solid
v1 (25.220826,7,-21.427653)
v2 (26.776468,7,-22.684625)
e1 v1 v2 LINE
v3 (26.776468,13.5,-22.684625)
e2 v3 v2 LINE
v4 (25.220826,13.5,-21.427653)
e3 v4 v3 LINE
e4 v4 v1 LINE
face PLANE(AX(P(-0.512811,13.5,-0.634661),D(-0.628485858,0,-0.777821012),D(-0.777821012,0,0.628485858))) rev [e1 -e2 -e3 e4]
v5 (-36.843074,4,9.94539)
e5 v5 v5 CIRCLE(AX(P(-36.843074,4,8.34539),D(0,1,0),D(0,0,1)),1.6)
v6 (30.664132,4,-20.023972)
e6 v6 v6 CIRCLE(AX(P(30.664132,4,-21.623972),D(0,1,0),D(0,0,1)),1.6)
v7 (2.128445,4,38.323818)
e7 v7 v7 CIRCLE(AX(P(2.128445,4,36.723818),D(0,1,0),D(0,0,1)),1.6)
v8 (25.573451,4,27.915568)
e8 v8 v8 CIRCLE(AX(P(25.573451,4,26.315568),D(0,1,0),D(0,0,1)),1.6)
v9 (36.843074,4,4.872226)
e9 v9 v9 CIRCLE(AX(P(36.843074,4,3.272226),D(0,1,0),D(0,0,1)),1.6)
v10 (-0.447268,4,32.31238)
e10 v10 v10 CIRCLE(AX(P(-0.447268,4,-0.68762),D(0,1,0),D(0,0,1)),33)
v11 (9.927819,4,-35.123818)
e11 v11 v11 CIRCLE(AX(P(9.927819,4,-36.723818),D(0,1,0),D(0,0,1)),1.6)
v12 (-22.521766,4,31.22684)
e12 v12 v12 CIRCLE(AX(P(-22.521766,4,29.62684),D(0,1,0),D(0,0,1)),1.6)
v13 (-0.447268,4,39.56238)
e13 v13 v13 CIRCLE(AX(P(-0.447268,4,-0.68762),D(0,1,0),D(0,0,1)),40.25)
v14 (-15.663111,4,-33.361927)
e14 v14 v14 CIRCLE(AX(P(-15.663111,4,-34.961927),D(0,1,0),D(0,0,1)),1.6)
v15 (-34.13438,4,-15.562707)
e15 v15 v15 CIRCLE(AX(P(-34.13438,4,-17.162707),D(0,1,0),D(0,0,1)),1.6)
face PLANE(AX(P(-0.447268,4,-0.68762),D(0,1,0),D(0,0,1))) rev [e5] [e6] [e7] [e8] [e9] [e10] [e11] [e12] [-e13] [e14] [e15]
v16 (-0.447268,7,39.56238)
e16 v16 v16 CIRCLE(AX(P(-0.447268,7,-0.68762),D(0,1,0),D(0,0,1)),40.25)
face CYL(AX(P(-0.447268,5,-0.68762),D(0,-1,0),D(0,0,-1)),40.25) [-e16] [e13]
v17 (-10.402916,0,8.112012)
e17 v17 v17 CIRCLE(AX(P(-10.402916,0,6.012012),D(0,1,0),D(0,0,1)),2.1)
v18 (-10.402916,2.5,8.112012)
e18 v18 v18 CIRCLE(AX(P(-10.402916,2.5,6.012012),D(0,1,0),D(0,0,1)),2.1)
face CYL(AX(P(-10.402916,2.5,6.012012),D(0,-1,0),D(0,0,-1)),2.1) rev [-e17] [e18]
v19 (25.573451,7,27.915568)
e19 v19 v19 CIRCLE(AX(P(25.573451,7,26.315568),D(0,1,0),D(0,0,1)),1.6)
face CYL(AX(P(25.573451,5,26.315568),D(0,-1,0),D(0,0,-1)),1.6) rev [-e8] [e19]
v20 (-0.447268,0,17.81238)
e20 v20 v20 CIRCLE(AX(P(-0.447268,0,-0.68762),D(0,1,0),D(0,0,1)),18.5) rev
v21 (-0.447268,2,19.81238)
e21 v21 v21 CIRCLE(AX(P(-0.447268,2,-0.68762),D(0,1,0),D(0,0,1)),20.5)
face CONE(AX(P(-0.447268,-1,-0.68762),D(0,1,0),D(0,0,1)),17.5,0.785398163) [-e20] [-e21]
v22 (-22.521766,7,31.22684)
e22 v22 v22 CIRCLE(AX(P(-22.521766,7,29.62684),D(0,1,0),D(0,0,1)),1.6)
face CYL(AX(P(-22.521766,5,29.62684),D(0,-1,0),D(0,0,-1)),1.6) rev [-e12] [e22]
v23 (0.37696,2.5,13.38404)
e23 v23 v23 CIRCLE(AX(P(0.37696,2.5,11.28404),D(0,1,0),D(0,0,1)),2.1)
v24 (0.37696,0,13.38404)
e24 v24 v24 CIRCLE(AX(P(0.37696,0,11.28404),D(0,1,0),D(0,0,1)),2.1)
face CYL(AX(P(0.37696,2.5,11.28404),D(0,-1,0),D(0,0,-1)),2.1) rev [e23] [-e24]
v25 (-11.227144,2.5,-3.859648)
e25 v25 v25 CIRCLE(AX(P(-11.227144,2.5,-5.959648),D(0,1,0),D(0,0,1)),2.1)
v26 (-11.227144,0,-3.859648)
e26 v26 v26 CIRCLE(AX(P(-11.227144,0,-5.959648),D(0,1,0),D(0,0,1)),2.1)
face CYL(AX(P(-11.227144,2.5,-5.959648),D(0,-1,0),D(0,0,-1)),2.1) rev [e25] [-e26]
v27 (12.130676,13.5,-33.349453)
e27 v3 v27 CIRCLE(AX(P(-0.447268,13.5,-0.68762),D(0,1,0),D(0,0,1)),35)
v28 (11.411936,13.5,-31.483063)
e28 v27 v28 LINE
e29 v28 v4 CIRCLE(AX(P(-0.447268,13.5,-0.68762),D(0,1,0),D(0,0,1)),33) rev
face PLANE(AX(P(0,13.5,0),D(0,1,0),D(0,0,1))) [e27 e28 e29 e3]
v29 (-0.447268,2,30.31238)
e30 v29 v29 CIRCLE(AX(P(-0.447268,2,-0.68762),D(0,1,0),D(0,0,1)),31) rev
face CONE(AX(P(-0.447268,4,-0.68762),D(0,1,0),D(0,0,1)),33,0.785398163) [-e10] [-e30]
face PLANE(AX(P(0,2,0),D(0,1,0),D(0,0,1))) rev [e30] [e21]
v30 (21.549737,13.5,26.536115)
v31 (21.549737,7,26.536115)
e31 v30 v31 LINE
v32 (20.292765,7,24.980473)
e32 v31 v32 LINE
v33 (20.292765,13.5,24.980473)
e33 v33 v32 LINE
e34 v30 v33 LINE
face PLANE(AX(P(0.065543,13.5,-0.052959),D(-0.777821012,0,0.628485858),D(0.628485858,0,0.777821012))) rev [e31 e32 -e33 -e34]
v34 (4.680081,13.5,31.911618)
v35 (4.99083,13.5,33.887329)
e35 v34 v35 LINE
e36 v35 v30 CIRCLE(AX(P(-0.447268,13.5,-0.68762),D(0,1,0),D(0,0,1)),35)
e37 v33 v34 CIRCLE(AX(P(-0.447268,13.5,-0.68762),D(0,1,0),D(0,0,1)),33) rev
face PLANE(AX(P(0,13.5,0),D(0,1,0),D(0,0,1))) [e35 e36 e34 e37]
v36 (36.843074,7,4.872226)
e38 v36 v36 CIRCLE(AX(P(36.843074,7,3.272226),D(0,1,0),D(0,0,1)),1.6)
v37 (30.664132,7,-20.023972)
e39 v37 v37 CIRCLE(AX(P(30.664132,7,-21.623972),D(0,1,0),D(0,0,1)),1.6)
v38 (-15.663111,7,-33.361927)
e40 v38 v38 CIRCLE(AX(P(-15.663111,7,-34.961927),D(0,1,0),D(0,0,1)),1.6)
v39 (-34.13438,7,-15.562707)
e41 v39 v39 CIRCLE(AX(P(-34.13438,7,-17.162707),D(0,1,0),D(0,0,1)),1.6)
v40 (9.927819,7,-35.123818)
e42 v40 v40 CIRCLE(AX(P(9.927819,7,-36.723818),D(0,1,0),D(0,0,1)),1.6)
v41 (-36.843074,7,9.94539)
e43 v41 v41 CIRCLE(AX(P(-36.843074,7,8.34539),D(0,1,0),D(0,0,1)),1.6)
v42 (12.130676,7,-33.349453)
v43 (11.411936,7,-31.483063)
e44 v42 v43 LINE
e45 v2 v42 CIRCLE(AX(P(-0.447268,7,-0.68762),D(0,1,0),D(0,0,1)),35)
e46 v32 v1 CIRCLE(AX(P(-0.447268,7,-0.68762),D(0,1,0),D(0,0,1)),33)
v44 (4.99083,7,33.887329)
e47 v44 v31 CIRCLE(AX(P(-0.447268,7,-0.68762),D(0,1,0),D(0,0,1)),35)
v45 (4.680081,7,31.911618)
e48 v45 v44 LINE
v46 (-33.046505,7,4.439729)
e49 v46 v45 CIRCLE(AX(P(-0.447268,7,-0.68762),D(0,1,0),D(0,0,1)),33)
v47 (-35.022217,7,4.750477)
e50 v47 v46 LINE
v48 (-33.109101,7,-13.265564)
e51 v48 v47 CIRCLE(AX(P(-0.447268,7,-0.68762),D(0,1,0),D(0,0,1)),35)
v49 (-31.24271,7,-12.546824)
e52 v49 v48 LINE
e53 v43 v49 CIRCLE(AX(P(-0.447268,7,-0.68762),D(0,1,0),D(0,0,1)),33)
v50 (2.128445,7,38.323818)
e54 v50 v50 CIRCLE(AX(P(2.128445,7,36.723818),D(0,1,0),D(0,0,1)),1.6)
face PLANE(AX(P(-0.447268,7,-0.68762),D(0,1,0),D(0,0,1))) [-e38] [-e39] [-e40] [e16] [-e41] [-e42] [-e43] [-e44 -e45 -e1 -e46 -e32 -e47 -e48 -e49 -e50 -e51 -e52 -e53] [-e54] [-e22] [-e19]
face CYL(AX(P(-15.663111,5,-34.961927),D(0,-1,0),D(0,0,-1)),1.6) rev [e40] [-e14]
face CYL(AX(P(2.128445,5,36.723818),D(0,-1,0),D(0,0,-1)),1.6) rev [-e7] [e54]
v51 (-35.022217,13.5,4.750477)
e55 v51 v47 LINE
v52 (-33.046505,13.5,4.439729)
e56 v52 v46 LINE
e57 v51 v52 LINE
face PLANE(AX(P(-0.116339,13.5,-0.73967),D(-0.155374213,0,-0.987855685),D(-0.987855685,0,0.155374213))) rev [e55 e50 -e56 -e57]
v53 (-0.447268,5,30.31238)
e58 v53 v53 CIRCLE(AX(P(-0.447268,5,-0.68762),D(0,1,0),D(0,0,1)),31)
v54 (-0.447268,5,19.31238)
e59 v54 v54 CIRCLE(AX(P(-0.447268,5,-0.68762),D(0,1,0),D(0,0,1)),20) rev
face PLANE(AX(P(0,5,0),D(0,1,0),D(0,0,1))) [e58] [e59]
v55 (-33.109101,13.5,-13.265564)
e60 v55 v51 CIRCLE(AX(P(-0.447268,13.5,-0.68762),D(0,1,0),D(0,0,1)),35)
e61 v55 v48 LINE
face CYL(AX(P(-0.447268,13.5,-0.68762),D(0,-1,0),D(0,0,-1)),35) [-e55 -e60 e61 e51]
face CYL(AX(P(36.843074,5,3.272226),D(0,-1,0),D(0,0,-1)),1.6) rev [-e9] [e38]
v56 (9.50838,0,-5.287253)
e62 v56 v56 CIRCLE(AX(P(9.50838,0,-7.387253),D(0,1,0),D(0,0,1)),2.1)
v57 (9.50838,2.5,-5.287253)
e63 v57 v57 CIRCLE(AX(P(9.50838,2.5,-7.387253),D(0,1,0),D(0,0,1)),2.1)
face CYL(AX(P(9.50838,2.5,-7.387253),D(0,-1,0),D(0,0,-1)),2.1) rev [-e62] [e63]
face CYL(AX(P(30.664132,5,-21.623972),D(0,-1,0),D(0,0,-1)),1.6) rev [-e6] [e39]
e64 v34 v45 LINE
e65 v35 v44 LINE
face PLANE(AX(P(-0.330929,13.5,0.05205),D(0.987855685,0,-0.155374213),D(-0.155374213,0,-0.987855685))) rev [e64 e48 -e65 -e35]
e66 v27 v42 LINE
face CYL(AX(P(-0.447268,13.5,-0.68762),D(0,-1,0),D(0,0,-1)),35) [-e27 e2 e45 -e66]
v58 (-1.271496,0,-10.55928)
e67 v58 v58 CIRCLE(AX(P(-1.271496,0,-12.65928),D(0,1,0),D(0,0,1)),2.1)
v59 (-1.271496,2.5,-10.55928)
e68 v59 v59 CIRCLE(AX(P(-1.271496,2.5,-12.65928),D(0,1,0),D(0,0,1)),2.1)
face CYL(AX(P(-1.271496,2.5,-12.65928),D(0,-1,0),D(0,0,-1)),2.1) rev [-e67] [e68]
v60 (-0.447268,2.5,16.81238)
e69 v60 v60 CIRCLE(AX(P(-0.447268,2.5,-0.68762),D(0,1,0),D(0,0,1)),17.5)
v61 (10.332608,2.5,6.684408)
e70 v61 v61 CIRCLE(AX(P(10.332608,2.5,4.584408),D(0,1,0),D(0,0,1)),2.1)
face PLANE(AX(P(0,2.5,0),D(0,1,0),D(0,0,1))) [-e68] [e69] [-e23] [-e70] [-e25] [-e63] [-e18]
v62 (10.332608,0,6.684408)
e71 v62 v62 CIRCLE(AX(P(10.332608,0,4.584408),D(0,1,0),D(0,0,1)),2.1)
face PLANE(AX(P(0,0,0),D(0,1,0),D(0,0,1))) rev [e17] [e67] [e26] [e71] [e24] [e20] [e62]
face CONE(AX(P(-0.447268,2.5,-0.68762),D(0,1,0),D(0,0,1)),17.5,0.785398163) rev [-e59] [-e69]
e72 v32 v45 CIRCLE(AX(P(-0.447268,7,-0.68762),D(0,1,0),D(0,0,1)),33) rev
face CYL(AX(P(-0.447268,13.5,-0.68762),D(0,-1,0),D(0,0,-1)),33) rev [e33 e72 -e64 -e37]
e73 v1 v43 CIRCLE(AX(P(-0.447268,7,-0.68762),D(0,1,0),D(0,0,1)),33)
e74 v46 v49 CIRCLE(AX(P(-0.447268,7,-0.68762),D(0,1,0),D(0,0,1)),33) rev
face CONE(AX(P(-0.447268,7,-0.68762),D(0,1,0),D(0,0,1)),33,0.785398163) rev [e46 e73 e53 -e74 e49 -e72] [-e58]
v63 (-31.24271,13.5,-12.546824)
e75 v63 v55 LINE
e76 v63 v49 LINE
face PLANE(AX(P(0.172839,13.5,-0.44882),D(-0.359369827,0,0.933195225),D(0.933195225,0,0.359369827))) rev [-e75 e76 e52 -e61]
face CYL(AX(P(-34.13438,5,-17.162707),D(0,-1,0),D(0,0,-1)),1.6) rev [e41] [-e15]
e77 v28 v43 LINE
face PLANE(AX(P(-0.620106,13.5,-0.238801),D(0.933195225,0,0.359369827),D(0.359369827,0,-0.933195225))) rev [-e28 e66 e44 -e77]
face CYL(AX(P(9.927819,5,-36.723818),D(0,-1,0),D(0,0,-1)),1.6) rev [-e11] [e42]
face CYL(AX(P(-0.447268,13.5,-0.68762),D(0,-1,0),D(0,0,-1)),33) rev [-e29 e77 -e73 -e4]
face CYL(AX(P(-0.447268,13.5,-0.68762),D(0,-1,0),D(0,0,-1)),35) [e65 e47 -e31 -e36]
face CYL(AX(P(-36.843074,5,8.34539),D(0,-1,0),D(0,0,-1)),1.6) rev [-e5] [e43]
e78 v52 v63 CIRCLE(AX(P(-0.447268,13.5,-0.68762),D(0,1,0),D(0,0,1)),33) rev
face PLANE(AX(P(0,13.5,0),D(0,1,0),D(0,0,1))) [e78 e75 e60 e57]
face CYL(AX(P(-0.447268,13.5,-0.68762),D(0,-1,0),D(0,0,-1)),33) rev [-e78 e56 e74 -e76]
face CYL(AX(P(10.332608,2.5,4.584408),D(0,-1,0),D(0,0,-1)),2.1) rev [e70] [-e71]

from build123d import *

# Parameters (mm, degrees)
EXTRUDE_START       = 2
SKETCH_3_R          = 40.25
SKETCH_3_R_2        = 1.6
SKETCH_3_R_3        = 17.5
EXTRUDE_1_DEPTH     = 3
SKETCH_3_4_R        = 17.5
SKETCH_3_4_R_2      = 2.1
EXTRUDE_3_DEPTH     = 2.5
CHAMFER_1_SIZE      = 3
CHAMFER_4_SIZE      = 2.5
SKETCH_4_R          = 40.25
SKETCH_4_R_2        = 33
SKETCH_4_R_3        = 1.6
EXTRUDE_4_DEPTH     = 2
CUT_EXTRUDE_START   = -13
SKETCH_4_4_R        = 40.25
SKETCH_4_4_R_2      = 33
SKETCH_4_4_R_3      = 1.6
CUT_EXTRUDE_4_DEPTH = 12
CHAMFER_5_SIZE      = 2
CHAMFER_8_SIZE      = 2
SKETCH_5_R          = 1.6
EXTRUDE_5_DEPTH     = 6.5


# Some blends are built 0.0001 mm under size
with BuildPart() as part:
    # 草图3 → 凸台-拉伸1 (new body)
    with BuildSketch(Plane(origin=(0, 0, 0), x_dir=(1, 0, 0), z_dir=(0, 1, 0)).offset(EXTRUDE_START)):
        with Locations(Location((-0.44726781, 0.687620087, 0), (0, 0, 270))):
            Circle(SKETCH_3_R)
        with Locations(Location((-15.663111428, 34.961926834, 0), (0, 0, 270))):
            Circle(SKETCH_3_R_2, mode=Mode.SUBTRACT)
        with Locations(Location((9.927819446, 36.723818061, 0), (0, 0, 270))):
            Circle(SKETCH_3_R_2, mode=Mode.SUBTRACT)
        with Locations(Location((30.664131688, 21.623971758, 0), (0, 0, 270))):
            Circle(SKETCH_3_R_2, mode=Mode.SUBTRACT)
        with Locations(Location((36.843074339, -3.272226173, 0), (0, 0, 270))):
            Circle(SKETCH_3_R_2, mode=Mode.SUBTRACT)
        with Locations(Location((25.573451463, -26.315568031, 0), (0, 0, 270))):
            Circle(SKETCH_3_R_2, mode=Mode.SUBTRACT)
        with Locations(Location((2.128444851, -36.723818061, 0), (0, 0, 270))):
            Circle(SKETCH_3_R_2, mode=Mode.SUBTRACT)
        with Locations(Location((-22.521766341, -29.6268404, 0), (0, 0, 270))):
            Circle(SKETCH_3_R_2, mode=Mode.SUBTRACT)
        with Locations(Location((-36.843074339, -8.34538977, 0), (0, 0, 270))):
            Circle(SKETCH_3_R_2, mode=Mode.SUBTRACT)
        with Locations(Location((-34.134379969, 17.162706563, 0), (0, 0, 270))):
            Circle(SKETCH_3_R_2, mode=Mode.SUBTRACT)
        with Locations(Location((-0.44726781, 0.687620087, 0), (0, 0, 270))):
            Circle(SKETCH_3_R_3, mode=Mode.SUBTRACT)
    extrude(amount=EXTRUDE_1_DEPTH)

    # 草图3<4> → 凸台-拉伸3 (add)
    with BuildSketch(Plane(origin=(0, 0, 0), x_dir=(1, 0, 0), z_dir=(0, 1, 0))):
        with Locations(Location((-0.44726781, 0.687620087, 0), (0, 0, 270))):
            Circle(SKETCH_3_4_R)
        with Locations(Location((-1.271495861, 12.659280294, 0), (0, 0, 270))):
            Circle(SKETCH_3_4_R_2, mode=Mode.SUBTRACT)
        with Locations(Location((9.508380029, 7.387252622, 0), (0, 0, 270))):
            Circle(SKETCH_3_4_R_2, mode=Mode.SUBTRACT)
        with Locations(Location((10.332608081, -4.584407586, 0), (0, 0, 270))):
            Circle(SKETCH_3_4_R_2, mode=Mode.SUBTRACT)
        with Locations(Location((0.376960242, -11.28404012, 0), (0, 0, 270))):
            Circle(SKETCH_3_4_R_2, mode=Mode.SUBTRACT)
        with Locations(Location((-10.402915649, -6.012012448, 0), (0, 0, 270))):
            Circle(SKETCH_3_4_R_2, mode=Mode.SUBTRACT)
        with Locations(Location((-11.227143701, 5.959647759, 0), (0, 0, 270))):
            Circle(SKETCH_3_4_R_2, mode=Mode.SUBTRACT)
    extrude(amount=EXTRUDE_3_DEPTH)

    # 倒角1
    # the kernel refuses this chamfer: 3 mm, written as the material it adds along each edge
    with BuildSketch(Plane(origin=(-0.44726781, 2, -0.687620087), x_dir=(0, 0, 1), z_dir=(-1, 0, 0))) as chamfer_1_piece_1_section:
        Polygon((17.5 + CHAMFER_1_SIZE, 0), (17.5, -CHAMFER_1_SIZE), (17.5, 0), align=None)
    chamfer_1_piece_1 = revolve(axis=Axis((-0.44726781, 2, -0.687620087), (0, 1, 0)), mode=Mode.PRIVATE)
    chamfer_1_piece_1 = split(chamfer_1_piece_1, bisect_by=Plane(origin=(-0.44726781, 0, -20.17366548), z_dir=(0, 1, 0)), keep=Keep.TOP, mode=Mode.PRIVATE)
    add(chamfer_1_piece_1)

    # 倒角4
    chamfer_4_edges = [part.edges().sort_by_distance(p)[0] for p in [
        (-0.44726781, 5, -18.187620087),
    ]]
    chamfer(chamfer_4_edges, length=CHAMFER_4_SIZE - 0.0001)  # a hair under: the kernel refuses the full size

    # 草图4 → 凸台-拉伸4 (add)
    with BuildSketch(Plane(origin=(0, 5, 0), x_dir=(1, 0, 0), z_dir=(0, 1, 0))):
        with Locations(Location((-0.44726781, 0.687620087, 0), (0, 0, 270))):
            Circle(SKETCH_4_R)
        with Locations(Location((-0.44726781, 0.687620087, 0), (0, 0, 270))):
            Circle(SKETCH_4_R_2, mode=Mode.SUBTRACT)
        with Locations(Location((-36.843074339, -8.34538977, 0), (0, 0, 270))):
            Circle(SKETCH_4_R_3, mode=Mode.SUBTRACT)
        with Locations(Location((-22.521766341, -29.6268404, 0), (0, 0, 270))):
            Circle(SKETCH_4_R_3, mode=Mode.SUBTRACT)
        with Locations(Location((2.128444851, -36.723818061, 0), (0, 0, 270))):
            Circle(SKETCH_4_R_3, mode=Mode.SUBTRACT)
        with Locations(Location((25.573451463, -26.315568031, 0), (0, 0, 270))):
            Circle(SKETCH_4_R_3, mode=Mode.SUBTRACT)
        with Locations(Location((36.843074339, -3.272226173, 0), (0, 0, 270))):
            Circle(SKETCH_4_R_3, mode=Mode.SUBTRACT)
        with Locations(Location((30.664131688, 21.623971758, 0), (0, 0, 270))):
            Circle(SKETCH_4_R_3, mode=Mode.SUBTRACT)
        with Locations(Location((9.927819446, 36.723818061, 0), (0, 0, 270))):
            Circle(SKETCH_4_R_3, mode=Mode.SUBTRACT)
        with Locations(Location((-15.663111428, 34.961926834, 0), (0, 0, 270))):
            Circle(SKETCH_4_R_3, mode=Mode.SUBTRACT)
        with Locations(Location((-34.134379969, 17.162706563, 0), (0, 0, 270))):
            Circle(SKETCH_4_R_3, mode=Mode.SUBTRACT)
    extrude(amount=EXTRUDE_4_DEPTH)

    # 草图4<4> → 切除-拉伸4 (cut)
    with BuildSketch(Plane(origin=(0, 5, 0), x_dir=(1, 0, 0), z_dir=(0, 1, 0)).offset(CUT_EXTRUDE_START)):
        with Locations(Location((-0.44726781, 0.687620087, 0), (0, 0, 270))):
            Circle(SKETCH_4_4_R)
        with Locations(Location((-0.44726781, 0.687620087, 0), (0, 0, 270))):
            Circle(SKETCH_4_4_R_2, mode=Mode.SUBTRACT)
        with Locations(Location((-36.843074339, -8.34538977, 0), (0, 0, 270))):
            Circle(SKETCH_4_4_R_3, mode=Mode.SUBTRACT)
        with Locations(Location((-22.521766341, -29.6268404, 0), (0, 0, 270))):
            Circle(SKETCH_4_4_R_3, mode=Mode.SUBTRACT)
        with Locations(Location((2.128444851, -36.723818061, 0), (0, 0, 270))):
            Circle(SKETCH_4_4_R_3, mode=Mode.SUBTRACT)
        with Locations(Location((25.573451463, -26.315568031, 0), (0, 0, 270))):
            Circle(SKETCH_4_4_R_3, mode=Mode.SUBTRACT)
        with Locations(Location((36.843074339, -3.272226173, 0), (0, 0, 270))):
            Circle(SKETCH_4_4_R_3, mode=Mode.SUBTRACT)
        with Locations(Location((30.664131688, 21.623971758, 0), (0, 0, 270))):
            Circle(SKETCH_4_4_R_3, mode=Mode.SUBTRACT)
        with Locations(Location((9.927819446, 36.723818061, 0), (0, 0, 270))):
            Circle(SKETCH_4_4_R_3, mode=Mode.SUBTRACT)
        with Locations(Location((-15.663111428, 34.961926834, 0), (0, 0, 270))):
            Circle(SKETCH_4_4_R_3, mode=Mode.SUBTRACT)
        with Locations(Location((-34.134379969, 17.162706563, 0), (0, 0, 270))):
            Circle(SKETCH_4_4_R_3, mode=Mode.SUBTRACT)
    extrude(amount=CUT_EXTRUDE_4_DEPTH, mode=Mode.SUBTRACT)

    # 倒角5
    chamfer_5_edges = [part.edges().sort_by_distance(p)[0] for p in [
        (-0.44726781, 5, -33.687620087),
    ]]
    chamfer(chamfer_5_edges, length=CHAMFER_5_SIZE - 0.0001)  # a hair under: the kernel refuses the full size

    # 倒角8
    chamfer_8_edges = [part.edges().sort_by_distance(p)[0] for p in [
        (-0.44726781, 2, -33.687620087),
    ]]
    chamfer(chamfer_8_edges, length=CHAMFER_8_SIZE - 0.0001)  # a hair under: the kernel refuses the full size

    # 草图5 → 凸台-拉伸5 (add)
    with BuildSketch(Plane(origin=(0, 7, 0), x_dir=(1, 0, 0), z_dir=(0, 1, 0))):
        with Locations(Location((9.927819446, 36.723818061, 0), (0, 0, 270))):
            Circle(SKETCH_5_R)
        with BuildLine():
            Line((21.54973721, -26.536115332), (20.292765494, -24.980473308))
            ThreePointArc((20.292765494, -24.980473308), (12.942674574, -29.47376985), (4.680081209, -31.911617512))
            Line((4.680081209, -31.911617512), (4.990829634, -33.887328882))
            ThreePointArc((4.990829634, -33.887328882), (13.754186234, -31.301732877), (21.54973721, -26.536115332))
        make_face()
        with BuildLine():
            Line((12.130676139, 33.34945295), (11.411936485, 31.483062501))
            ThreePointArc((11.411936485, 31.483062501), (18.978290897, 27.364345315), (25.220825585, 21.427653391))
            Line((25.220825585, 21.427653391), (26.776467609, 22.684625106))
            ThreePointArc((26.776467609, 22.684625106), (20.155597485, 28.981116541), (12.130676139, 33.34945295))
        make_face()
        with BuildLine():
            Line((-35.022216779, -4.750477357), (-33.046505409, -4.439728932))
            ThreePointArc((-33.046505409, -4.439728932), (-33.262768901, 4.172284796), (-31.242710224, 12.546824382))
            Line((-31.242710224, 12.546824382), (-33.109100673, 13.265564036))
            ThreePointArc((-33.109100673, 13.265564036), (-35.251587149, 4.383476596), (-35.022216779, -4.750477357))
        make_face()
    extrude(amount=EXTRUDE_5_DEPTH)


with BuildPart() as extrude_5_kept_piece:
    # of the separate pieces the step leaves, the one the design keeps (extrude_5_pieces_kept)
    add(part.part.solids().sort_by_distance((-0.44726781, 3.9999, 32.312379913))[0])


solid = extrude_5_kept_piece.part
